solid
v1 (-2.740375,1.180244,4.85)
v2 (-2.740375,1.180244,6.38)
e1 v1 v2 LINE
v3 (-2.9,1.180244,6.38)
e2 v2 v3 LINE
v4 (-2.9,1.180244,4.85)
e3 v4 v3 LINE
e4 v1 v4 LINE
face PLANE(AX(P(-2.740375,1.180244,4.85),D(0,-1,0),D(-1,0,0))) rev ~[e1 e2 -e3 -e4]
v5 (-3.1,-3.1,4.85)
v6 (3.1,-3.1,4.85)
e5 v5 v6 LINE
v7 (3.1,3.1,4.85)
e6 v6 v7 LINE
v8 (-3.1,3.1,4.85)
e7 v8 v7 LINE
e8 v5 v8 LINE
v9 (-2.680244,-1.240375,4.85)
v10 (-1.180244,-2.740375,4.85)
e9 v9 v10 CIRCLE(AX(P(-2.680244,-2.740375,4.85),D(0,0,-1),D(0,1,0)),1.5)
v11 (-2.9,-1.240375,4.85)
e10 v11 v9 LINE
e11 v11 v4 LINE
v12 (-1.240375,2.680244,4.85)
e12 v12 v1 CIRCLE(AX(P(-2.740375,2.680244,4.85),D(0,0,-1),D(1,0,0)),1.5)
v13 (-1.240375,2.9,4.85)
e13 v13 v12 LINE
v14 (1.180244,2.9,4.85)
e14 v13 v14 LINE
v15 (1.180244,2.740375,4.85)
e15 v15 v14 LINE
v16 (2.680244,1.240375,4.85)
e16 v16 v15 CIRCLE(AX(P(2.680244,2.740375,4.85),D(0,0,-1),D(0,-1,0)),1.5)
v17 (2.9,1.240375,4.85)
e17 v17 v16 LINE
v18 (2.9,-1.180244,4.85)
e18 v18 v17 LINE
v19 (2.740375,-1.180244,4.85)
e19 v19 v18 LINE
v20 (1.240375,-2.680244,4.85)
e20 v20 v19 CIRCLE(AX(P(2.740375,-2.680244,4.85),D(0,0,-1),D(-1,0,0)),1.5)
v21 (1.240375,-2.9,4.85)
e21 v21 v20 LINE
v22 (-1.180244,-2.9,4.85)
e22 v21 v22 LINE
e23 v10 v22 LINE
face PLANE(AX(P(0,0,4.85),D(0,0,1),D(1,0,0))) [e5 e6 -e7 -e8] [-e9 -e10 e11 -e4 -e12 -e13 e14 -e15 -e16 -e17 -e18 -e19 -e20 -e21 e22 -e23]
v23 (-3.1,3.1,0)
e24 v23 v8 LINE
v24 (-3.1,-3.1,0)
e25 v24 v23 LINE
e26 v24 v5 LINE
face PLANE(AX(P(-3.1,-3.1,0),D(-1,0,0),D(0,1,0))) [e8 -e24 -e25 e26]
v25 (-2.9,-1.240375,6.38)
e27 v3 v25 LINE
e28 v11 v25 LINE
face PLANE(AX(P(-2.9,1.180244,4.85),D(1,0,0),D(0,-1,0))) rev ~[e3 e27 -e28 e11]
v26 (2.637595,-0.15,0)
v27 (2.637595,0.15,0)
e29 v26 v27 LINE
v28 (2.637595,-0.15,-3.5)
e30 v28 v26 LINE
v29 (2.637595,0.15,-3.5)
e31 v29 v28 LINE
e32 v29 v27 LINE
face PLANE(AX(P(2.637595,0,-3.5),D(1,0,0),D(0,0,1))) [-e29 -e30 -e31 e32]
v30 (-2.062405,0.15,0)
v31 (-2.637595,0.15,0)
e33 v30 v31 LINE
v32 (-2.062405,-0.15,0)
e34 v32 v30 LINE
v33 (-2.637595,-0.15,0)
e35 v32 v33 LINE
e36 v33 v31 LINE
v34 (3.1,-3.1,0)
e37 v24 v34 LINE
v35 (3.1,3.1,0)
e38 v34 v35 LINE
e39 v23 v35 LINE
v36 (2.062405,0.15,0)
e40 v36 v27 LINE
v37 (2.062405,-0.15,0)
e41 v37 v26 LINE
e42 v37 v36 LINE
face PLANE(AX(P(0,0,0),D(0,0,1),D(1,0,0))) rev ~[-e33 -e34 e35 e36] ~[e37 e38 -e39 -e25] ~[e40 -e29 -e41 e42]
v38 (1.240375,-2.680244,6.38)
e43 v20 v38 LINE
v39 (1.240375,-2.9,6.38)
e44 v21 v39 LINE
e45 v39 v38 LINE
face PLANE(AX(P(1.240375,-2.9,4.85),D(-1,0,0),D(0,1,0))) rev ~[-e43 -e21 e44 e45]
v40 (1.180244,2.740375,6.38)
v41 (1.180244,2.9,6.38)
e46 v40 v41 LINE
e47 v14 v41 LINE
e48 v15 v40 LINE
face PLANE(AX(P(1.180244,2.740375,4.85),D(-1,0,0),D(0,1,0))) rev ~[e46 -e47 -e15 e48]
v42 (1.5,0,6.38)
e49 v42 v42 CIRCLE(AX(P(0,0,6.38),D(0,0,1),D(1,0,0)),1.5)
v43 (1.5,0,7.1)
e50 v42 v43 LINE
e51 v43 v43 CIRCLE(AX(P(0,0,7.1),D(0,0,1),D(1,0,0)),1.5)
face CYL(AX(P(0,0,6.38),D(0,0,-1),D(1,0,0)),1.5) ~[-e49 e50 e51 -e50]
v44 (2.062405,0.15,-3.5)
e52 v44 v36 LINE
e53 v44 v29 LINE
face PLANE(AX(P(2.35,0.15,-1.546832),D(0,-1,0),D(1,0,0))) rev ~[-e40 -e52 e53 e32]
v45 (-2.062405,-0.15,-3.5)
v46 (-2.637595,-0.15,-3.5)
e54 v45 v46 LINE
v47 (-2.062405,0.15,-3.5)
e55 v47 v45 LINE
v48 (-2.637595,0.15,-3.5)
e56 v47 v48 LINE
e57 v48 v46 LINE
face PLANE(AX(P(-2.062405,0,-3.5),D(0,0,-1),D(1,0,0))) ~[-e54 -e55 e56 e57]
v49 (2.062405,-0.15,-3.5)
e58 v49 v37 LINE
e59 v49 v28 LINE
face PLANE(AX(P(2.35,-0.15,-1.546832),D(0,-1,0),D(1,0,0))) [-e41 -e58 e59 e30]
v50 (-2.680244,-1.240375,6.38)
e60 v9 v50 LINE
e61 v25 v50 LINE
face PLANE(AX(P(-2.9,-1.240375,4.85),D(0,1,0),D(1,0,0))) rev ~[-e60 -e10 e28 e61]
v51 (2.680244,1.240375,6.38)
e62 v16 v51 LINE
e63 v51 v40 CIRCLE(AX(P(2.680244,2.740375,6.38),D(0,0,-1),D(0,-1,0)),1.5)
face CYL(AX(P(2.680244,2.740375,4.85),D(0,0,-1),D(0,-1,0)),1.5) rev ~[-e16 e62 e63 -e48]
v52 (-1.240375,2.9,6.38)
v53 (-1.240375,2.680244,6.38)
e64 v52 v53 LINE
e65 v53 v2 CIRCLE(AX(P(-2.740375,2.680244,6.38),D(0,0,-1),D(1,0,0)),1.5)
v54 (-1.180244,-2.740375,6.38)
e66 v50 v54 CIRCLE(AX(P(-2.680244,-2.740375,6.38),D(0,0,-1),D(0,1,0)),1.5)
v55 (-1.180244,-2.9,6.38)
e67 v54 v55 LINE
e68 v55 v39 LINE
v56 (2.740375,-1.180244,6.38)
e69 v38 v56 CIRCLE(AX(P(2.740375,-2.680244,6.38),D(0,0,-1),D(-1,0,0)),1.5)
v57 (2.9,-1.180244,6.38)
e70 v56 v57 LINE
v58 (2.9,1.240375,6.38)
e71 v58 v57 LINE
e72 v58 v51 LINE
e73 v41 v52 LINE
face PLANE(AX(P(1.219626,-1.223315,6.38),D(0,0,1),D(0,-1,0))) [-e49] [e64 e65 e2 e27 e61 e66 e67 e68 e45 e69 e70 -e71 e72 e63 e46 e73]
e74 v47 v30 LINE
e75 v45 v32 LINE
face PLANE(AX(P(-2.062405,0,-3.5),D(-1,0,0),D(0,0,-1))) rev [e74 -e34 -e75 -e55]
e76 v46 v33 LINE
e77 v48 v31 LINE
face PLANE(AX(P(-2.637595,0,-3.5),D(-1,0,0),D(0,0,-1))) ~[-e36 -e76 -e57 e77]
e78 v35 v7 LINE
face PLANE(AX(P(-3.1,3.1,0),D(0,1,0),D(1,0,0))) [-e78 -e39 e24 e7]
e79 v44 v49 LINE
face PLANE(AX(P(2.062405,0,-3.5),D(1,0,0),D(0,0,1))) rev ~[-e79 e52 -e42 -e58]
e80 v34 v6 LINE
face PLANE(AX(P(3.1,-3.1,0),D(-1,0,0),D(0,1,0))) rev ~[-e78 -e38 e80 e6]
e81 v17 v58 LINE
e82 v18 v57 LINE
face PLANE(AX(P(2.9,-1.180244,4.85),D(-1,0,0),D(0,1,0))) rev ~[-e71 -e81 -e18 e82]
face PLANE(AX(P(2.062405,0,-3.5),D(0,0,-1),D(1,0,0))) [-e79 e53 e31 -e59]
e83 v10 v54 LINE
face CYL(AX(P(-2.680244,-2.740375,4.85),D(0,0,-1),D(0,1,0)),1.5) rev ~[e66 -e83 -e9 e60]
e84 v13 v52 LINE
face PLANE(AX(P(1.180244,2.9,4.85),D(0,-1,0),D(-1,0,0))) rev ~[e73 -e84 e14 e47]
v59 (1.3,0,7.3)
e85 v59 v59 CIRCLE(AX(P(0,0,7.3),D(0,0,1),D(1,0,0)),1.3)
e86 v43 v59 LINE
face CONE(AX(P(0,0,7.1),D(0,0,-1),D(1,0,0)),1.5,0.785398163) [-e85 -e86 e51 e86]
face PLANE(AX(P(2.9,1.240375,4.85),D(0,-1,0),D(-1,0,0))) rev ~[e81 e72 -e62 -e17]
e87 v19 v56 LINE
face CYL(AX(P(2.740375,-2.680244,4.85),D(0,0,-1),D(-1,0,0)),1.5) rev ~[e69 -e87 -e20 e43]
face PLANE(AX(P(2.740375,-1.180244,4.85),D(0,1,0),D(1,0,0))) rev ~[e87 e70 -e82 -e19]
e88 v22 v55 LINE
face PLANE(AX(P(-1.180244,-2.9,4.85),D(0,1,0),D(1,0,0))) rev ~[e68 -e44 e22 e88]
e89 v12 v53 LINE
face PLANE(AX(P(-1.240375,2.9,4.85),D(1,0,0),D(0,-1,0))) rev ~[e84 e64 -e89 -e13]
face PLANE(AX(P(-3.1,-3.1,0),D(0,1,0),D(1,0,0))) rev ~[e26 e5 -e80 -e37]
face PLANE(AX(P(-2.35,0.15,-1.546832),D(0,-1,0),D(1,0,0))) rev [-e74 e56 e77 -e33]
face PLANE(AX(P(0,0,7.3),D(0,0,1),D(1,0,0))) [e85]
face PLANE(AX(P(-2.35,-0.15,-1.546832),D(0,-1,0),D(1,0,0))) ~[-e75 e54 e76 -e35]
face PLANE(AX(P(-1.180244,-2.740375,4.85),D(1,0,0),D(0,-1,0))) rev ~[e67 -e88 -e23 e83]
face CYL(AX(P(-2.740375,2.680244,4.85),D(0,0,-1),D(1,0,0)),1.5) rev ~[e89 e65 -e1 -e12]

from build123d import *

# Parameters (mm, degrees)
F0_W            = 6.2
F0_H            = 6.2
F1_DEPTH        = 4.85
F3_DEPTH        = 1.53
F3_COPIES_COUNT = 4
F5_R            = 1.5
F6_DEPTH        = 0.92
F7_SIZE         = 0.2
F8_W            = 0.5751895329
F8_H            = 3.9063365496
F9_DEPTH        = 0.15


# Not quite as in the source:
# - a pattern or mirror of a feature is missing from the dataset's text; its kind, count and spacing are read off the source's solid


with BuildPart() as f1:
    # F0 (on Top) → F1 (new body)
    with BuildSketch(Plane.XY):
        Rectangle(F0_W, F0_H)
    extrude(amount=F1_DEPTH)

    # F2 (on face) → F3 (join)
    with BuildSketch(Plane.XY.offset(4.85)):
        with BuildLine():
            Line((1.1802440276, 2.9), (0, 2.9))
            Line((0, 2.9), (0, 0))
            Line((0, 0), (2.9, 0))
            Line((2.9, 0), (2.9, 1.2403748352))
            Line((2.9, 1.2403748352), (2.6802440276, 1.2403748352))
            ThreePointArc((2.6802440276, 1.2403748352), (1.6195838559, 1.6797146634), (1.1802440276, 2.7403748352))
            Line((1.1802440276, 2.7403748352), (1.1802440276, 2.9))
        make_face()
    f3 = extrude(amount=F3_DEPTH)

    # F3_copies: F3 ×4 about axis
    f3_copies_axis = Axis((0, 0, 0), (0, 0, 1))
    for i in range(1, F3_COPIES_COUNT):
        add(f3.rotate(f3_copies_axis, i * 360 / F3_COPIES_COUNT))

    # F5 (on face) → F6 (join)
    with BuildSketch(Plane.XY.offset(6.38)):
        Circle(F5_R)
    extrude(amount=F6_DEPTH)

    # F7
    f7_edges = [f1.edges().sort_by_distance(p)[0] for p in [
        (-1.5, 0, 7.3),
    ]]
    chamfer(f7_edges, length=F7_SIZE)

    # F8 (on Front) → F9 (join, symmetric)
    with BuildSketch(Plane.XZ):
        with Locations((2.35, -1.5468317252)):
            Rectangle(F8_W, F8_H)
    f9 = extrude(amount=F9_DEPTH, both=True)

    # F9_copies: F9 across plane
    add(f9.mirror(Plane(origin=(0, 0, 0), x_dir=(0, 0, -1), z_dir=(-1, 0, 0))))


solid = f1.part
